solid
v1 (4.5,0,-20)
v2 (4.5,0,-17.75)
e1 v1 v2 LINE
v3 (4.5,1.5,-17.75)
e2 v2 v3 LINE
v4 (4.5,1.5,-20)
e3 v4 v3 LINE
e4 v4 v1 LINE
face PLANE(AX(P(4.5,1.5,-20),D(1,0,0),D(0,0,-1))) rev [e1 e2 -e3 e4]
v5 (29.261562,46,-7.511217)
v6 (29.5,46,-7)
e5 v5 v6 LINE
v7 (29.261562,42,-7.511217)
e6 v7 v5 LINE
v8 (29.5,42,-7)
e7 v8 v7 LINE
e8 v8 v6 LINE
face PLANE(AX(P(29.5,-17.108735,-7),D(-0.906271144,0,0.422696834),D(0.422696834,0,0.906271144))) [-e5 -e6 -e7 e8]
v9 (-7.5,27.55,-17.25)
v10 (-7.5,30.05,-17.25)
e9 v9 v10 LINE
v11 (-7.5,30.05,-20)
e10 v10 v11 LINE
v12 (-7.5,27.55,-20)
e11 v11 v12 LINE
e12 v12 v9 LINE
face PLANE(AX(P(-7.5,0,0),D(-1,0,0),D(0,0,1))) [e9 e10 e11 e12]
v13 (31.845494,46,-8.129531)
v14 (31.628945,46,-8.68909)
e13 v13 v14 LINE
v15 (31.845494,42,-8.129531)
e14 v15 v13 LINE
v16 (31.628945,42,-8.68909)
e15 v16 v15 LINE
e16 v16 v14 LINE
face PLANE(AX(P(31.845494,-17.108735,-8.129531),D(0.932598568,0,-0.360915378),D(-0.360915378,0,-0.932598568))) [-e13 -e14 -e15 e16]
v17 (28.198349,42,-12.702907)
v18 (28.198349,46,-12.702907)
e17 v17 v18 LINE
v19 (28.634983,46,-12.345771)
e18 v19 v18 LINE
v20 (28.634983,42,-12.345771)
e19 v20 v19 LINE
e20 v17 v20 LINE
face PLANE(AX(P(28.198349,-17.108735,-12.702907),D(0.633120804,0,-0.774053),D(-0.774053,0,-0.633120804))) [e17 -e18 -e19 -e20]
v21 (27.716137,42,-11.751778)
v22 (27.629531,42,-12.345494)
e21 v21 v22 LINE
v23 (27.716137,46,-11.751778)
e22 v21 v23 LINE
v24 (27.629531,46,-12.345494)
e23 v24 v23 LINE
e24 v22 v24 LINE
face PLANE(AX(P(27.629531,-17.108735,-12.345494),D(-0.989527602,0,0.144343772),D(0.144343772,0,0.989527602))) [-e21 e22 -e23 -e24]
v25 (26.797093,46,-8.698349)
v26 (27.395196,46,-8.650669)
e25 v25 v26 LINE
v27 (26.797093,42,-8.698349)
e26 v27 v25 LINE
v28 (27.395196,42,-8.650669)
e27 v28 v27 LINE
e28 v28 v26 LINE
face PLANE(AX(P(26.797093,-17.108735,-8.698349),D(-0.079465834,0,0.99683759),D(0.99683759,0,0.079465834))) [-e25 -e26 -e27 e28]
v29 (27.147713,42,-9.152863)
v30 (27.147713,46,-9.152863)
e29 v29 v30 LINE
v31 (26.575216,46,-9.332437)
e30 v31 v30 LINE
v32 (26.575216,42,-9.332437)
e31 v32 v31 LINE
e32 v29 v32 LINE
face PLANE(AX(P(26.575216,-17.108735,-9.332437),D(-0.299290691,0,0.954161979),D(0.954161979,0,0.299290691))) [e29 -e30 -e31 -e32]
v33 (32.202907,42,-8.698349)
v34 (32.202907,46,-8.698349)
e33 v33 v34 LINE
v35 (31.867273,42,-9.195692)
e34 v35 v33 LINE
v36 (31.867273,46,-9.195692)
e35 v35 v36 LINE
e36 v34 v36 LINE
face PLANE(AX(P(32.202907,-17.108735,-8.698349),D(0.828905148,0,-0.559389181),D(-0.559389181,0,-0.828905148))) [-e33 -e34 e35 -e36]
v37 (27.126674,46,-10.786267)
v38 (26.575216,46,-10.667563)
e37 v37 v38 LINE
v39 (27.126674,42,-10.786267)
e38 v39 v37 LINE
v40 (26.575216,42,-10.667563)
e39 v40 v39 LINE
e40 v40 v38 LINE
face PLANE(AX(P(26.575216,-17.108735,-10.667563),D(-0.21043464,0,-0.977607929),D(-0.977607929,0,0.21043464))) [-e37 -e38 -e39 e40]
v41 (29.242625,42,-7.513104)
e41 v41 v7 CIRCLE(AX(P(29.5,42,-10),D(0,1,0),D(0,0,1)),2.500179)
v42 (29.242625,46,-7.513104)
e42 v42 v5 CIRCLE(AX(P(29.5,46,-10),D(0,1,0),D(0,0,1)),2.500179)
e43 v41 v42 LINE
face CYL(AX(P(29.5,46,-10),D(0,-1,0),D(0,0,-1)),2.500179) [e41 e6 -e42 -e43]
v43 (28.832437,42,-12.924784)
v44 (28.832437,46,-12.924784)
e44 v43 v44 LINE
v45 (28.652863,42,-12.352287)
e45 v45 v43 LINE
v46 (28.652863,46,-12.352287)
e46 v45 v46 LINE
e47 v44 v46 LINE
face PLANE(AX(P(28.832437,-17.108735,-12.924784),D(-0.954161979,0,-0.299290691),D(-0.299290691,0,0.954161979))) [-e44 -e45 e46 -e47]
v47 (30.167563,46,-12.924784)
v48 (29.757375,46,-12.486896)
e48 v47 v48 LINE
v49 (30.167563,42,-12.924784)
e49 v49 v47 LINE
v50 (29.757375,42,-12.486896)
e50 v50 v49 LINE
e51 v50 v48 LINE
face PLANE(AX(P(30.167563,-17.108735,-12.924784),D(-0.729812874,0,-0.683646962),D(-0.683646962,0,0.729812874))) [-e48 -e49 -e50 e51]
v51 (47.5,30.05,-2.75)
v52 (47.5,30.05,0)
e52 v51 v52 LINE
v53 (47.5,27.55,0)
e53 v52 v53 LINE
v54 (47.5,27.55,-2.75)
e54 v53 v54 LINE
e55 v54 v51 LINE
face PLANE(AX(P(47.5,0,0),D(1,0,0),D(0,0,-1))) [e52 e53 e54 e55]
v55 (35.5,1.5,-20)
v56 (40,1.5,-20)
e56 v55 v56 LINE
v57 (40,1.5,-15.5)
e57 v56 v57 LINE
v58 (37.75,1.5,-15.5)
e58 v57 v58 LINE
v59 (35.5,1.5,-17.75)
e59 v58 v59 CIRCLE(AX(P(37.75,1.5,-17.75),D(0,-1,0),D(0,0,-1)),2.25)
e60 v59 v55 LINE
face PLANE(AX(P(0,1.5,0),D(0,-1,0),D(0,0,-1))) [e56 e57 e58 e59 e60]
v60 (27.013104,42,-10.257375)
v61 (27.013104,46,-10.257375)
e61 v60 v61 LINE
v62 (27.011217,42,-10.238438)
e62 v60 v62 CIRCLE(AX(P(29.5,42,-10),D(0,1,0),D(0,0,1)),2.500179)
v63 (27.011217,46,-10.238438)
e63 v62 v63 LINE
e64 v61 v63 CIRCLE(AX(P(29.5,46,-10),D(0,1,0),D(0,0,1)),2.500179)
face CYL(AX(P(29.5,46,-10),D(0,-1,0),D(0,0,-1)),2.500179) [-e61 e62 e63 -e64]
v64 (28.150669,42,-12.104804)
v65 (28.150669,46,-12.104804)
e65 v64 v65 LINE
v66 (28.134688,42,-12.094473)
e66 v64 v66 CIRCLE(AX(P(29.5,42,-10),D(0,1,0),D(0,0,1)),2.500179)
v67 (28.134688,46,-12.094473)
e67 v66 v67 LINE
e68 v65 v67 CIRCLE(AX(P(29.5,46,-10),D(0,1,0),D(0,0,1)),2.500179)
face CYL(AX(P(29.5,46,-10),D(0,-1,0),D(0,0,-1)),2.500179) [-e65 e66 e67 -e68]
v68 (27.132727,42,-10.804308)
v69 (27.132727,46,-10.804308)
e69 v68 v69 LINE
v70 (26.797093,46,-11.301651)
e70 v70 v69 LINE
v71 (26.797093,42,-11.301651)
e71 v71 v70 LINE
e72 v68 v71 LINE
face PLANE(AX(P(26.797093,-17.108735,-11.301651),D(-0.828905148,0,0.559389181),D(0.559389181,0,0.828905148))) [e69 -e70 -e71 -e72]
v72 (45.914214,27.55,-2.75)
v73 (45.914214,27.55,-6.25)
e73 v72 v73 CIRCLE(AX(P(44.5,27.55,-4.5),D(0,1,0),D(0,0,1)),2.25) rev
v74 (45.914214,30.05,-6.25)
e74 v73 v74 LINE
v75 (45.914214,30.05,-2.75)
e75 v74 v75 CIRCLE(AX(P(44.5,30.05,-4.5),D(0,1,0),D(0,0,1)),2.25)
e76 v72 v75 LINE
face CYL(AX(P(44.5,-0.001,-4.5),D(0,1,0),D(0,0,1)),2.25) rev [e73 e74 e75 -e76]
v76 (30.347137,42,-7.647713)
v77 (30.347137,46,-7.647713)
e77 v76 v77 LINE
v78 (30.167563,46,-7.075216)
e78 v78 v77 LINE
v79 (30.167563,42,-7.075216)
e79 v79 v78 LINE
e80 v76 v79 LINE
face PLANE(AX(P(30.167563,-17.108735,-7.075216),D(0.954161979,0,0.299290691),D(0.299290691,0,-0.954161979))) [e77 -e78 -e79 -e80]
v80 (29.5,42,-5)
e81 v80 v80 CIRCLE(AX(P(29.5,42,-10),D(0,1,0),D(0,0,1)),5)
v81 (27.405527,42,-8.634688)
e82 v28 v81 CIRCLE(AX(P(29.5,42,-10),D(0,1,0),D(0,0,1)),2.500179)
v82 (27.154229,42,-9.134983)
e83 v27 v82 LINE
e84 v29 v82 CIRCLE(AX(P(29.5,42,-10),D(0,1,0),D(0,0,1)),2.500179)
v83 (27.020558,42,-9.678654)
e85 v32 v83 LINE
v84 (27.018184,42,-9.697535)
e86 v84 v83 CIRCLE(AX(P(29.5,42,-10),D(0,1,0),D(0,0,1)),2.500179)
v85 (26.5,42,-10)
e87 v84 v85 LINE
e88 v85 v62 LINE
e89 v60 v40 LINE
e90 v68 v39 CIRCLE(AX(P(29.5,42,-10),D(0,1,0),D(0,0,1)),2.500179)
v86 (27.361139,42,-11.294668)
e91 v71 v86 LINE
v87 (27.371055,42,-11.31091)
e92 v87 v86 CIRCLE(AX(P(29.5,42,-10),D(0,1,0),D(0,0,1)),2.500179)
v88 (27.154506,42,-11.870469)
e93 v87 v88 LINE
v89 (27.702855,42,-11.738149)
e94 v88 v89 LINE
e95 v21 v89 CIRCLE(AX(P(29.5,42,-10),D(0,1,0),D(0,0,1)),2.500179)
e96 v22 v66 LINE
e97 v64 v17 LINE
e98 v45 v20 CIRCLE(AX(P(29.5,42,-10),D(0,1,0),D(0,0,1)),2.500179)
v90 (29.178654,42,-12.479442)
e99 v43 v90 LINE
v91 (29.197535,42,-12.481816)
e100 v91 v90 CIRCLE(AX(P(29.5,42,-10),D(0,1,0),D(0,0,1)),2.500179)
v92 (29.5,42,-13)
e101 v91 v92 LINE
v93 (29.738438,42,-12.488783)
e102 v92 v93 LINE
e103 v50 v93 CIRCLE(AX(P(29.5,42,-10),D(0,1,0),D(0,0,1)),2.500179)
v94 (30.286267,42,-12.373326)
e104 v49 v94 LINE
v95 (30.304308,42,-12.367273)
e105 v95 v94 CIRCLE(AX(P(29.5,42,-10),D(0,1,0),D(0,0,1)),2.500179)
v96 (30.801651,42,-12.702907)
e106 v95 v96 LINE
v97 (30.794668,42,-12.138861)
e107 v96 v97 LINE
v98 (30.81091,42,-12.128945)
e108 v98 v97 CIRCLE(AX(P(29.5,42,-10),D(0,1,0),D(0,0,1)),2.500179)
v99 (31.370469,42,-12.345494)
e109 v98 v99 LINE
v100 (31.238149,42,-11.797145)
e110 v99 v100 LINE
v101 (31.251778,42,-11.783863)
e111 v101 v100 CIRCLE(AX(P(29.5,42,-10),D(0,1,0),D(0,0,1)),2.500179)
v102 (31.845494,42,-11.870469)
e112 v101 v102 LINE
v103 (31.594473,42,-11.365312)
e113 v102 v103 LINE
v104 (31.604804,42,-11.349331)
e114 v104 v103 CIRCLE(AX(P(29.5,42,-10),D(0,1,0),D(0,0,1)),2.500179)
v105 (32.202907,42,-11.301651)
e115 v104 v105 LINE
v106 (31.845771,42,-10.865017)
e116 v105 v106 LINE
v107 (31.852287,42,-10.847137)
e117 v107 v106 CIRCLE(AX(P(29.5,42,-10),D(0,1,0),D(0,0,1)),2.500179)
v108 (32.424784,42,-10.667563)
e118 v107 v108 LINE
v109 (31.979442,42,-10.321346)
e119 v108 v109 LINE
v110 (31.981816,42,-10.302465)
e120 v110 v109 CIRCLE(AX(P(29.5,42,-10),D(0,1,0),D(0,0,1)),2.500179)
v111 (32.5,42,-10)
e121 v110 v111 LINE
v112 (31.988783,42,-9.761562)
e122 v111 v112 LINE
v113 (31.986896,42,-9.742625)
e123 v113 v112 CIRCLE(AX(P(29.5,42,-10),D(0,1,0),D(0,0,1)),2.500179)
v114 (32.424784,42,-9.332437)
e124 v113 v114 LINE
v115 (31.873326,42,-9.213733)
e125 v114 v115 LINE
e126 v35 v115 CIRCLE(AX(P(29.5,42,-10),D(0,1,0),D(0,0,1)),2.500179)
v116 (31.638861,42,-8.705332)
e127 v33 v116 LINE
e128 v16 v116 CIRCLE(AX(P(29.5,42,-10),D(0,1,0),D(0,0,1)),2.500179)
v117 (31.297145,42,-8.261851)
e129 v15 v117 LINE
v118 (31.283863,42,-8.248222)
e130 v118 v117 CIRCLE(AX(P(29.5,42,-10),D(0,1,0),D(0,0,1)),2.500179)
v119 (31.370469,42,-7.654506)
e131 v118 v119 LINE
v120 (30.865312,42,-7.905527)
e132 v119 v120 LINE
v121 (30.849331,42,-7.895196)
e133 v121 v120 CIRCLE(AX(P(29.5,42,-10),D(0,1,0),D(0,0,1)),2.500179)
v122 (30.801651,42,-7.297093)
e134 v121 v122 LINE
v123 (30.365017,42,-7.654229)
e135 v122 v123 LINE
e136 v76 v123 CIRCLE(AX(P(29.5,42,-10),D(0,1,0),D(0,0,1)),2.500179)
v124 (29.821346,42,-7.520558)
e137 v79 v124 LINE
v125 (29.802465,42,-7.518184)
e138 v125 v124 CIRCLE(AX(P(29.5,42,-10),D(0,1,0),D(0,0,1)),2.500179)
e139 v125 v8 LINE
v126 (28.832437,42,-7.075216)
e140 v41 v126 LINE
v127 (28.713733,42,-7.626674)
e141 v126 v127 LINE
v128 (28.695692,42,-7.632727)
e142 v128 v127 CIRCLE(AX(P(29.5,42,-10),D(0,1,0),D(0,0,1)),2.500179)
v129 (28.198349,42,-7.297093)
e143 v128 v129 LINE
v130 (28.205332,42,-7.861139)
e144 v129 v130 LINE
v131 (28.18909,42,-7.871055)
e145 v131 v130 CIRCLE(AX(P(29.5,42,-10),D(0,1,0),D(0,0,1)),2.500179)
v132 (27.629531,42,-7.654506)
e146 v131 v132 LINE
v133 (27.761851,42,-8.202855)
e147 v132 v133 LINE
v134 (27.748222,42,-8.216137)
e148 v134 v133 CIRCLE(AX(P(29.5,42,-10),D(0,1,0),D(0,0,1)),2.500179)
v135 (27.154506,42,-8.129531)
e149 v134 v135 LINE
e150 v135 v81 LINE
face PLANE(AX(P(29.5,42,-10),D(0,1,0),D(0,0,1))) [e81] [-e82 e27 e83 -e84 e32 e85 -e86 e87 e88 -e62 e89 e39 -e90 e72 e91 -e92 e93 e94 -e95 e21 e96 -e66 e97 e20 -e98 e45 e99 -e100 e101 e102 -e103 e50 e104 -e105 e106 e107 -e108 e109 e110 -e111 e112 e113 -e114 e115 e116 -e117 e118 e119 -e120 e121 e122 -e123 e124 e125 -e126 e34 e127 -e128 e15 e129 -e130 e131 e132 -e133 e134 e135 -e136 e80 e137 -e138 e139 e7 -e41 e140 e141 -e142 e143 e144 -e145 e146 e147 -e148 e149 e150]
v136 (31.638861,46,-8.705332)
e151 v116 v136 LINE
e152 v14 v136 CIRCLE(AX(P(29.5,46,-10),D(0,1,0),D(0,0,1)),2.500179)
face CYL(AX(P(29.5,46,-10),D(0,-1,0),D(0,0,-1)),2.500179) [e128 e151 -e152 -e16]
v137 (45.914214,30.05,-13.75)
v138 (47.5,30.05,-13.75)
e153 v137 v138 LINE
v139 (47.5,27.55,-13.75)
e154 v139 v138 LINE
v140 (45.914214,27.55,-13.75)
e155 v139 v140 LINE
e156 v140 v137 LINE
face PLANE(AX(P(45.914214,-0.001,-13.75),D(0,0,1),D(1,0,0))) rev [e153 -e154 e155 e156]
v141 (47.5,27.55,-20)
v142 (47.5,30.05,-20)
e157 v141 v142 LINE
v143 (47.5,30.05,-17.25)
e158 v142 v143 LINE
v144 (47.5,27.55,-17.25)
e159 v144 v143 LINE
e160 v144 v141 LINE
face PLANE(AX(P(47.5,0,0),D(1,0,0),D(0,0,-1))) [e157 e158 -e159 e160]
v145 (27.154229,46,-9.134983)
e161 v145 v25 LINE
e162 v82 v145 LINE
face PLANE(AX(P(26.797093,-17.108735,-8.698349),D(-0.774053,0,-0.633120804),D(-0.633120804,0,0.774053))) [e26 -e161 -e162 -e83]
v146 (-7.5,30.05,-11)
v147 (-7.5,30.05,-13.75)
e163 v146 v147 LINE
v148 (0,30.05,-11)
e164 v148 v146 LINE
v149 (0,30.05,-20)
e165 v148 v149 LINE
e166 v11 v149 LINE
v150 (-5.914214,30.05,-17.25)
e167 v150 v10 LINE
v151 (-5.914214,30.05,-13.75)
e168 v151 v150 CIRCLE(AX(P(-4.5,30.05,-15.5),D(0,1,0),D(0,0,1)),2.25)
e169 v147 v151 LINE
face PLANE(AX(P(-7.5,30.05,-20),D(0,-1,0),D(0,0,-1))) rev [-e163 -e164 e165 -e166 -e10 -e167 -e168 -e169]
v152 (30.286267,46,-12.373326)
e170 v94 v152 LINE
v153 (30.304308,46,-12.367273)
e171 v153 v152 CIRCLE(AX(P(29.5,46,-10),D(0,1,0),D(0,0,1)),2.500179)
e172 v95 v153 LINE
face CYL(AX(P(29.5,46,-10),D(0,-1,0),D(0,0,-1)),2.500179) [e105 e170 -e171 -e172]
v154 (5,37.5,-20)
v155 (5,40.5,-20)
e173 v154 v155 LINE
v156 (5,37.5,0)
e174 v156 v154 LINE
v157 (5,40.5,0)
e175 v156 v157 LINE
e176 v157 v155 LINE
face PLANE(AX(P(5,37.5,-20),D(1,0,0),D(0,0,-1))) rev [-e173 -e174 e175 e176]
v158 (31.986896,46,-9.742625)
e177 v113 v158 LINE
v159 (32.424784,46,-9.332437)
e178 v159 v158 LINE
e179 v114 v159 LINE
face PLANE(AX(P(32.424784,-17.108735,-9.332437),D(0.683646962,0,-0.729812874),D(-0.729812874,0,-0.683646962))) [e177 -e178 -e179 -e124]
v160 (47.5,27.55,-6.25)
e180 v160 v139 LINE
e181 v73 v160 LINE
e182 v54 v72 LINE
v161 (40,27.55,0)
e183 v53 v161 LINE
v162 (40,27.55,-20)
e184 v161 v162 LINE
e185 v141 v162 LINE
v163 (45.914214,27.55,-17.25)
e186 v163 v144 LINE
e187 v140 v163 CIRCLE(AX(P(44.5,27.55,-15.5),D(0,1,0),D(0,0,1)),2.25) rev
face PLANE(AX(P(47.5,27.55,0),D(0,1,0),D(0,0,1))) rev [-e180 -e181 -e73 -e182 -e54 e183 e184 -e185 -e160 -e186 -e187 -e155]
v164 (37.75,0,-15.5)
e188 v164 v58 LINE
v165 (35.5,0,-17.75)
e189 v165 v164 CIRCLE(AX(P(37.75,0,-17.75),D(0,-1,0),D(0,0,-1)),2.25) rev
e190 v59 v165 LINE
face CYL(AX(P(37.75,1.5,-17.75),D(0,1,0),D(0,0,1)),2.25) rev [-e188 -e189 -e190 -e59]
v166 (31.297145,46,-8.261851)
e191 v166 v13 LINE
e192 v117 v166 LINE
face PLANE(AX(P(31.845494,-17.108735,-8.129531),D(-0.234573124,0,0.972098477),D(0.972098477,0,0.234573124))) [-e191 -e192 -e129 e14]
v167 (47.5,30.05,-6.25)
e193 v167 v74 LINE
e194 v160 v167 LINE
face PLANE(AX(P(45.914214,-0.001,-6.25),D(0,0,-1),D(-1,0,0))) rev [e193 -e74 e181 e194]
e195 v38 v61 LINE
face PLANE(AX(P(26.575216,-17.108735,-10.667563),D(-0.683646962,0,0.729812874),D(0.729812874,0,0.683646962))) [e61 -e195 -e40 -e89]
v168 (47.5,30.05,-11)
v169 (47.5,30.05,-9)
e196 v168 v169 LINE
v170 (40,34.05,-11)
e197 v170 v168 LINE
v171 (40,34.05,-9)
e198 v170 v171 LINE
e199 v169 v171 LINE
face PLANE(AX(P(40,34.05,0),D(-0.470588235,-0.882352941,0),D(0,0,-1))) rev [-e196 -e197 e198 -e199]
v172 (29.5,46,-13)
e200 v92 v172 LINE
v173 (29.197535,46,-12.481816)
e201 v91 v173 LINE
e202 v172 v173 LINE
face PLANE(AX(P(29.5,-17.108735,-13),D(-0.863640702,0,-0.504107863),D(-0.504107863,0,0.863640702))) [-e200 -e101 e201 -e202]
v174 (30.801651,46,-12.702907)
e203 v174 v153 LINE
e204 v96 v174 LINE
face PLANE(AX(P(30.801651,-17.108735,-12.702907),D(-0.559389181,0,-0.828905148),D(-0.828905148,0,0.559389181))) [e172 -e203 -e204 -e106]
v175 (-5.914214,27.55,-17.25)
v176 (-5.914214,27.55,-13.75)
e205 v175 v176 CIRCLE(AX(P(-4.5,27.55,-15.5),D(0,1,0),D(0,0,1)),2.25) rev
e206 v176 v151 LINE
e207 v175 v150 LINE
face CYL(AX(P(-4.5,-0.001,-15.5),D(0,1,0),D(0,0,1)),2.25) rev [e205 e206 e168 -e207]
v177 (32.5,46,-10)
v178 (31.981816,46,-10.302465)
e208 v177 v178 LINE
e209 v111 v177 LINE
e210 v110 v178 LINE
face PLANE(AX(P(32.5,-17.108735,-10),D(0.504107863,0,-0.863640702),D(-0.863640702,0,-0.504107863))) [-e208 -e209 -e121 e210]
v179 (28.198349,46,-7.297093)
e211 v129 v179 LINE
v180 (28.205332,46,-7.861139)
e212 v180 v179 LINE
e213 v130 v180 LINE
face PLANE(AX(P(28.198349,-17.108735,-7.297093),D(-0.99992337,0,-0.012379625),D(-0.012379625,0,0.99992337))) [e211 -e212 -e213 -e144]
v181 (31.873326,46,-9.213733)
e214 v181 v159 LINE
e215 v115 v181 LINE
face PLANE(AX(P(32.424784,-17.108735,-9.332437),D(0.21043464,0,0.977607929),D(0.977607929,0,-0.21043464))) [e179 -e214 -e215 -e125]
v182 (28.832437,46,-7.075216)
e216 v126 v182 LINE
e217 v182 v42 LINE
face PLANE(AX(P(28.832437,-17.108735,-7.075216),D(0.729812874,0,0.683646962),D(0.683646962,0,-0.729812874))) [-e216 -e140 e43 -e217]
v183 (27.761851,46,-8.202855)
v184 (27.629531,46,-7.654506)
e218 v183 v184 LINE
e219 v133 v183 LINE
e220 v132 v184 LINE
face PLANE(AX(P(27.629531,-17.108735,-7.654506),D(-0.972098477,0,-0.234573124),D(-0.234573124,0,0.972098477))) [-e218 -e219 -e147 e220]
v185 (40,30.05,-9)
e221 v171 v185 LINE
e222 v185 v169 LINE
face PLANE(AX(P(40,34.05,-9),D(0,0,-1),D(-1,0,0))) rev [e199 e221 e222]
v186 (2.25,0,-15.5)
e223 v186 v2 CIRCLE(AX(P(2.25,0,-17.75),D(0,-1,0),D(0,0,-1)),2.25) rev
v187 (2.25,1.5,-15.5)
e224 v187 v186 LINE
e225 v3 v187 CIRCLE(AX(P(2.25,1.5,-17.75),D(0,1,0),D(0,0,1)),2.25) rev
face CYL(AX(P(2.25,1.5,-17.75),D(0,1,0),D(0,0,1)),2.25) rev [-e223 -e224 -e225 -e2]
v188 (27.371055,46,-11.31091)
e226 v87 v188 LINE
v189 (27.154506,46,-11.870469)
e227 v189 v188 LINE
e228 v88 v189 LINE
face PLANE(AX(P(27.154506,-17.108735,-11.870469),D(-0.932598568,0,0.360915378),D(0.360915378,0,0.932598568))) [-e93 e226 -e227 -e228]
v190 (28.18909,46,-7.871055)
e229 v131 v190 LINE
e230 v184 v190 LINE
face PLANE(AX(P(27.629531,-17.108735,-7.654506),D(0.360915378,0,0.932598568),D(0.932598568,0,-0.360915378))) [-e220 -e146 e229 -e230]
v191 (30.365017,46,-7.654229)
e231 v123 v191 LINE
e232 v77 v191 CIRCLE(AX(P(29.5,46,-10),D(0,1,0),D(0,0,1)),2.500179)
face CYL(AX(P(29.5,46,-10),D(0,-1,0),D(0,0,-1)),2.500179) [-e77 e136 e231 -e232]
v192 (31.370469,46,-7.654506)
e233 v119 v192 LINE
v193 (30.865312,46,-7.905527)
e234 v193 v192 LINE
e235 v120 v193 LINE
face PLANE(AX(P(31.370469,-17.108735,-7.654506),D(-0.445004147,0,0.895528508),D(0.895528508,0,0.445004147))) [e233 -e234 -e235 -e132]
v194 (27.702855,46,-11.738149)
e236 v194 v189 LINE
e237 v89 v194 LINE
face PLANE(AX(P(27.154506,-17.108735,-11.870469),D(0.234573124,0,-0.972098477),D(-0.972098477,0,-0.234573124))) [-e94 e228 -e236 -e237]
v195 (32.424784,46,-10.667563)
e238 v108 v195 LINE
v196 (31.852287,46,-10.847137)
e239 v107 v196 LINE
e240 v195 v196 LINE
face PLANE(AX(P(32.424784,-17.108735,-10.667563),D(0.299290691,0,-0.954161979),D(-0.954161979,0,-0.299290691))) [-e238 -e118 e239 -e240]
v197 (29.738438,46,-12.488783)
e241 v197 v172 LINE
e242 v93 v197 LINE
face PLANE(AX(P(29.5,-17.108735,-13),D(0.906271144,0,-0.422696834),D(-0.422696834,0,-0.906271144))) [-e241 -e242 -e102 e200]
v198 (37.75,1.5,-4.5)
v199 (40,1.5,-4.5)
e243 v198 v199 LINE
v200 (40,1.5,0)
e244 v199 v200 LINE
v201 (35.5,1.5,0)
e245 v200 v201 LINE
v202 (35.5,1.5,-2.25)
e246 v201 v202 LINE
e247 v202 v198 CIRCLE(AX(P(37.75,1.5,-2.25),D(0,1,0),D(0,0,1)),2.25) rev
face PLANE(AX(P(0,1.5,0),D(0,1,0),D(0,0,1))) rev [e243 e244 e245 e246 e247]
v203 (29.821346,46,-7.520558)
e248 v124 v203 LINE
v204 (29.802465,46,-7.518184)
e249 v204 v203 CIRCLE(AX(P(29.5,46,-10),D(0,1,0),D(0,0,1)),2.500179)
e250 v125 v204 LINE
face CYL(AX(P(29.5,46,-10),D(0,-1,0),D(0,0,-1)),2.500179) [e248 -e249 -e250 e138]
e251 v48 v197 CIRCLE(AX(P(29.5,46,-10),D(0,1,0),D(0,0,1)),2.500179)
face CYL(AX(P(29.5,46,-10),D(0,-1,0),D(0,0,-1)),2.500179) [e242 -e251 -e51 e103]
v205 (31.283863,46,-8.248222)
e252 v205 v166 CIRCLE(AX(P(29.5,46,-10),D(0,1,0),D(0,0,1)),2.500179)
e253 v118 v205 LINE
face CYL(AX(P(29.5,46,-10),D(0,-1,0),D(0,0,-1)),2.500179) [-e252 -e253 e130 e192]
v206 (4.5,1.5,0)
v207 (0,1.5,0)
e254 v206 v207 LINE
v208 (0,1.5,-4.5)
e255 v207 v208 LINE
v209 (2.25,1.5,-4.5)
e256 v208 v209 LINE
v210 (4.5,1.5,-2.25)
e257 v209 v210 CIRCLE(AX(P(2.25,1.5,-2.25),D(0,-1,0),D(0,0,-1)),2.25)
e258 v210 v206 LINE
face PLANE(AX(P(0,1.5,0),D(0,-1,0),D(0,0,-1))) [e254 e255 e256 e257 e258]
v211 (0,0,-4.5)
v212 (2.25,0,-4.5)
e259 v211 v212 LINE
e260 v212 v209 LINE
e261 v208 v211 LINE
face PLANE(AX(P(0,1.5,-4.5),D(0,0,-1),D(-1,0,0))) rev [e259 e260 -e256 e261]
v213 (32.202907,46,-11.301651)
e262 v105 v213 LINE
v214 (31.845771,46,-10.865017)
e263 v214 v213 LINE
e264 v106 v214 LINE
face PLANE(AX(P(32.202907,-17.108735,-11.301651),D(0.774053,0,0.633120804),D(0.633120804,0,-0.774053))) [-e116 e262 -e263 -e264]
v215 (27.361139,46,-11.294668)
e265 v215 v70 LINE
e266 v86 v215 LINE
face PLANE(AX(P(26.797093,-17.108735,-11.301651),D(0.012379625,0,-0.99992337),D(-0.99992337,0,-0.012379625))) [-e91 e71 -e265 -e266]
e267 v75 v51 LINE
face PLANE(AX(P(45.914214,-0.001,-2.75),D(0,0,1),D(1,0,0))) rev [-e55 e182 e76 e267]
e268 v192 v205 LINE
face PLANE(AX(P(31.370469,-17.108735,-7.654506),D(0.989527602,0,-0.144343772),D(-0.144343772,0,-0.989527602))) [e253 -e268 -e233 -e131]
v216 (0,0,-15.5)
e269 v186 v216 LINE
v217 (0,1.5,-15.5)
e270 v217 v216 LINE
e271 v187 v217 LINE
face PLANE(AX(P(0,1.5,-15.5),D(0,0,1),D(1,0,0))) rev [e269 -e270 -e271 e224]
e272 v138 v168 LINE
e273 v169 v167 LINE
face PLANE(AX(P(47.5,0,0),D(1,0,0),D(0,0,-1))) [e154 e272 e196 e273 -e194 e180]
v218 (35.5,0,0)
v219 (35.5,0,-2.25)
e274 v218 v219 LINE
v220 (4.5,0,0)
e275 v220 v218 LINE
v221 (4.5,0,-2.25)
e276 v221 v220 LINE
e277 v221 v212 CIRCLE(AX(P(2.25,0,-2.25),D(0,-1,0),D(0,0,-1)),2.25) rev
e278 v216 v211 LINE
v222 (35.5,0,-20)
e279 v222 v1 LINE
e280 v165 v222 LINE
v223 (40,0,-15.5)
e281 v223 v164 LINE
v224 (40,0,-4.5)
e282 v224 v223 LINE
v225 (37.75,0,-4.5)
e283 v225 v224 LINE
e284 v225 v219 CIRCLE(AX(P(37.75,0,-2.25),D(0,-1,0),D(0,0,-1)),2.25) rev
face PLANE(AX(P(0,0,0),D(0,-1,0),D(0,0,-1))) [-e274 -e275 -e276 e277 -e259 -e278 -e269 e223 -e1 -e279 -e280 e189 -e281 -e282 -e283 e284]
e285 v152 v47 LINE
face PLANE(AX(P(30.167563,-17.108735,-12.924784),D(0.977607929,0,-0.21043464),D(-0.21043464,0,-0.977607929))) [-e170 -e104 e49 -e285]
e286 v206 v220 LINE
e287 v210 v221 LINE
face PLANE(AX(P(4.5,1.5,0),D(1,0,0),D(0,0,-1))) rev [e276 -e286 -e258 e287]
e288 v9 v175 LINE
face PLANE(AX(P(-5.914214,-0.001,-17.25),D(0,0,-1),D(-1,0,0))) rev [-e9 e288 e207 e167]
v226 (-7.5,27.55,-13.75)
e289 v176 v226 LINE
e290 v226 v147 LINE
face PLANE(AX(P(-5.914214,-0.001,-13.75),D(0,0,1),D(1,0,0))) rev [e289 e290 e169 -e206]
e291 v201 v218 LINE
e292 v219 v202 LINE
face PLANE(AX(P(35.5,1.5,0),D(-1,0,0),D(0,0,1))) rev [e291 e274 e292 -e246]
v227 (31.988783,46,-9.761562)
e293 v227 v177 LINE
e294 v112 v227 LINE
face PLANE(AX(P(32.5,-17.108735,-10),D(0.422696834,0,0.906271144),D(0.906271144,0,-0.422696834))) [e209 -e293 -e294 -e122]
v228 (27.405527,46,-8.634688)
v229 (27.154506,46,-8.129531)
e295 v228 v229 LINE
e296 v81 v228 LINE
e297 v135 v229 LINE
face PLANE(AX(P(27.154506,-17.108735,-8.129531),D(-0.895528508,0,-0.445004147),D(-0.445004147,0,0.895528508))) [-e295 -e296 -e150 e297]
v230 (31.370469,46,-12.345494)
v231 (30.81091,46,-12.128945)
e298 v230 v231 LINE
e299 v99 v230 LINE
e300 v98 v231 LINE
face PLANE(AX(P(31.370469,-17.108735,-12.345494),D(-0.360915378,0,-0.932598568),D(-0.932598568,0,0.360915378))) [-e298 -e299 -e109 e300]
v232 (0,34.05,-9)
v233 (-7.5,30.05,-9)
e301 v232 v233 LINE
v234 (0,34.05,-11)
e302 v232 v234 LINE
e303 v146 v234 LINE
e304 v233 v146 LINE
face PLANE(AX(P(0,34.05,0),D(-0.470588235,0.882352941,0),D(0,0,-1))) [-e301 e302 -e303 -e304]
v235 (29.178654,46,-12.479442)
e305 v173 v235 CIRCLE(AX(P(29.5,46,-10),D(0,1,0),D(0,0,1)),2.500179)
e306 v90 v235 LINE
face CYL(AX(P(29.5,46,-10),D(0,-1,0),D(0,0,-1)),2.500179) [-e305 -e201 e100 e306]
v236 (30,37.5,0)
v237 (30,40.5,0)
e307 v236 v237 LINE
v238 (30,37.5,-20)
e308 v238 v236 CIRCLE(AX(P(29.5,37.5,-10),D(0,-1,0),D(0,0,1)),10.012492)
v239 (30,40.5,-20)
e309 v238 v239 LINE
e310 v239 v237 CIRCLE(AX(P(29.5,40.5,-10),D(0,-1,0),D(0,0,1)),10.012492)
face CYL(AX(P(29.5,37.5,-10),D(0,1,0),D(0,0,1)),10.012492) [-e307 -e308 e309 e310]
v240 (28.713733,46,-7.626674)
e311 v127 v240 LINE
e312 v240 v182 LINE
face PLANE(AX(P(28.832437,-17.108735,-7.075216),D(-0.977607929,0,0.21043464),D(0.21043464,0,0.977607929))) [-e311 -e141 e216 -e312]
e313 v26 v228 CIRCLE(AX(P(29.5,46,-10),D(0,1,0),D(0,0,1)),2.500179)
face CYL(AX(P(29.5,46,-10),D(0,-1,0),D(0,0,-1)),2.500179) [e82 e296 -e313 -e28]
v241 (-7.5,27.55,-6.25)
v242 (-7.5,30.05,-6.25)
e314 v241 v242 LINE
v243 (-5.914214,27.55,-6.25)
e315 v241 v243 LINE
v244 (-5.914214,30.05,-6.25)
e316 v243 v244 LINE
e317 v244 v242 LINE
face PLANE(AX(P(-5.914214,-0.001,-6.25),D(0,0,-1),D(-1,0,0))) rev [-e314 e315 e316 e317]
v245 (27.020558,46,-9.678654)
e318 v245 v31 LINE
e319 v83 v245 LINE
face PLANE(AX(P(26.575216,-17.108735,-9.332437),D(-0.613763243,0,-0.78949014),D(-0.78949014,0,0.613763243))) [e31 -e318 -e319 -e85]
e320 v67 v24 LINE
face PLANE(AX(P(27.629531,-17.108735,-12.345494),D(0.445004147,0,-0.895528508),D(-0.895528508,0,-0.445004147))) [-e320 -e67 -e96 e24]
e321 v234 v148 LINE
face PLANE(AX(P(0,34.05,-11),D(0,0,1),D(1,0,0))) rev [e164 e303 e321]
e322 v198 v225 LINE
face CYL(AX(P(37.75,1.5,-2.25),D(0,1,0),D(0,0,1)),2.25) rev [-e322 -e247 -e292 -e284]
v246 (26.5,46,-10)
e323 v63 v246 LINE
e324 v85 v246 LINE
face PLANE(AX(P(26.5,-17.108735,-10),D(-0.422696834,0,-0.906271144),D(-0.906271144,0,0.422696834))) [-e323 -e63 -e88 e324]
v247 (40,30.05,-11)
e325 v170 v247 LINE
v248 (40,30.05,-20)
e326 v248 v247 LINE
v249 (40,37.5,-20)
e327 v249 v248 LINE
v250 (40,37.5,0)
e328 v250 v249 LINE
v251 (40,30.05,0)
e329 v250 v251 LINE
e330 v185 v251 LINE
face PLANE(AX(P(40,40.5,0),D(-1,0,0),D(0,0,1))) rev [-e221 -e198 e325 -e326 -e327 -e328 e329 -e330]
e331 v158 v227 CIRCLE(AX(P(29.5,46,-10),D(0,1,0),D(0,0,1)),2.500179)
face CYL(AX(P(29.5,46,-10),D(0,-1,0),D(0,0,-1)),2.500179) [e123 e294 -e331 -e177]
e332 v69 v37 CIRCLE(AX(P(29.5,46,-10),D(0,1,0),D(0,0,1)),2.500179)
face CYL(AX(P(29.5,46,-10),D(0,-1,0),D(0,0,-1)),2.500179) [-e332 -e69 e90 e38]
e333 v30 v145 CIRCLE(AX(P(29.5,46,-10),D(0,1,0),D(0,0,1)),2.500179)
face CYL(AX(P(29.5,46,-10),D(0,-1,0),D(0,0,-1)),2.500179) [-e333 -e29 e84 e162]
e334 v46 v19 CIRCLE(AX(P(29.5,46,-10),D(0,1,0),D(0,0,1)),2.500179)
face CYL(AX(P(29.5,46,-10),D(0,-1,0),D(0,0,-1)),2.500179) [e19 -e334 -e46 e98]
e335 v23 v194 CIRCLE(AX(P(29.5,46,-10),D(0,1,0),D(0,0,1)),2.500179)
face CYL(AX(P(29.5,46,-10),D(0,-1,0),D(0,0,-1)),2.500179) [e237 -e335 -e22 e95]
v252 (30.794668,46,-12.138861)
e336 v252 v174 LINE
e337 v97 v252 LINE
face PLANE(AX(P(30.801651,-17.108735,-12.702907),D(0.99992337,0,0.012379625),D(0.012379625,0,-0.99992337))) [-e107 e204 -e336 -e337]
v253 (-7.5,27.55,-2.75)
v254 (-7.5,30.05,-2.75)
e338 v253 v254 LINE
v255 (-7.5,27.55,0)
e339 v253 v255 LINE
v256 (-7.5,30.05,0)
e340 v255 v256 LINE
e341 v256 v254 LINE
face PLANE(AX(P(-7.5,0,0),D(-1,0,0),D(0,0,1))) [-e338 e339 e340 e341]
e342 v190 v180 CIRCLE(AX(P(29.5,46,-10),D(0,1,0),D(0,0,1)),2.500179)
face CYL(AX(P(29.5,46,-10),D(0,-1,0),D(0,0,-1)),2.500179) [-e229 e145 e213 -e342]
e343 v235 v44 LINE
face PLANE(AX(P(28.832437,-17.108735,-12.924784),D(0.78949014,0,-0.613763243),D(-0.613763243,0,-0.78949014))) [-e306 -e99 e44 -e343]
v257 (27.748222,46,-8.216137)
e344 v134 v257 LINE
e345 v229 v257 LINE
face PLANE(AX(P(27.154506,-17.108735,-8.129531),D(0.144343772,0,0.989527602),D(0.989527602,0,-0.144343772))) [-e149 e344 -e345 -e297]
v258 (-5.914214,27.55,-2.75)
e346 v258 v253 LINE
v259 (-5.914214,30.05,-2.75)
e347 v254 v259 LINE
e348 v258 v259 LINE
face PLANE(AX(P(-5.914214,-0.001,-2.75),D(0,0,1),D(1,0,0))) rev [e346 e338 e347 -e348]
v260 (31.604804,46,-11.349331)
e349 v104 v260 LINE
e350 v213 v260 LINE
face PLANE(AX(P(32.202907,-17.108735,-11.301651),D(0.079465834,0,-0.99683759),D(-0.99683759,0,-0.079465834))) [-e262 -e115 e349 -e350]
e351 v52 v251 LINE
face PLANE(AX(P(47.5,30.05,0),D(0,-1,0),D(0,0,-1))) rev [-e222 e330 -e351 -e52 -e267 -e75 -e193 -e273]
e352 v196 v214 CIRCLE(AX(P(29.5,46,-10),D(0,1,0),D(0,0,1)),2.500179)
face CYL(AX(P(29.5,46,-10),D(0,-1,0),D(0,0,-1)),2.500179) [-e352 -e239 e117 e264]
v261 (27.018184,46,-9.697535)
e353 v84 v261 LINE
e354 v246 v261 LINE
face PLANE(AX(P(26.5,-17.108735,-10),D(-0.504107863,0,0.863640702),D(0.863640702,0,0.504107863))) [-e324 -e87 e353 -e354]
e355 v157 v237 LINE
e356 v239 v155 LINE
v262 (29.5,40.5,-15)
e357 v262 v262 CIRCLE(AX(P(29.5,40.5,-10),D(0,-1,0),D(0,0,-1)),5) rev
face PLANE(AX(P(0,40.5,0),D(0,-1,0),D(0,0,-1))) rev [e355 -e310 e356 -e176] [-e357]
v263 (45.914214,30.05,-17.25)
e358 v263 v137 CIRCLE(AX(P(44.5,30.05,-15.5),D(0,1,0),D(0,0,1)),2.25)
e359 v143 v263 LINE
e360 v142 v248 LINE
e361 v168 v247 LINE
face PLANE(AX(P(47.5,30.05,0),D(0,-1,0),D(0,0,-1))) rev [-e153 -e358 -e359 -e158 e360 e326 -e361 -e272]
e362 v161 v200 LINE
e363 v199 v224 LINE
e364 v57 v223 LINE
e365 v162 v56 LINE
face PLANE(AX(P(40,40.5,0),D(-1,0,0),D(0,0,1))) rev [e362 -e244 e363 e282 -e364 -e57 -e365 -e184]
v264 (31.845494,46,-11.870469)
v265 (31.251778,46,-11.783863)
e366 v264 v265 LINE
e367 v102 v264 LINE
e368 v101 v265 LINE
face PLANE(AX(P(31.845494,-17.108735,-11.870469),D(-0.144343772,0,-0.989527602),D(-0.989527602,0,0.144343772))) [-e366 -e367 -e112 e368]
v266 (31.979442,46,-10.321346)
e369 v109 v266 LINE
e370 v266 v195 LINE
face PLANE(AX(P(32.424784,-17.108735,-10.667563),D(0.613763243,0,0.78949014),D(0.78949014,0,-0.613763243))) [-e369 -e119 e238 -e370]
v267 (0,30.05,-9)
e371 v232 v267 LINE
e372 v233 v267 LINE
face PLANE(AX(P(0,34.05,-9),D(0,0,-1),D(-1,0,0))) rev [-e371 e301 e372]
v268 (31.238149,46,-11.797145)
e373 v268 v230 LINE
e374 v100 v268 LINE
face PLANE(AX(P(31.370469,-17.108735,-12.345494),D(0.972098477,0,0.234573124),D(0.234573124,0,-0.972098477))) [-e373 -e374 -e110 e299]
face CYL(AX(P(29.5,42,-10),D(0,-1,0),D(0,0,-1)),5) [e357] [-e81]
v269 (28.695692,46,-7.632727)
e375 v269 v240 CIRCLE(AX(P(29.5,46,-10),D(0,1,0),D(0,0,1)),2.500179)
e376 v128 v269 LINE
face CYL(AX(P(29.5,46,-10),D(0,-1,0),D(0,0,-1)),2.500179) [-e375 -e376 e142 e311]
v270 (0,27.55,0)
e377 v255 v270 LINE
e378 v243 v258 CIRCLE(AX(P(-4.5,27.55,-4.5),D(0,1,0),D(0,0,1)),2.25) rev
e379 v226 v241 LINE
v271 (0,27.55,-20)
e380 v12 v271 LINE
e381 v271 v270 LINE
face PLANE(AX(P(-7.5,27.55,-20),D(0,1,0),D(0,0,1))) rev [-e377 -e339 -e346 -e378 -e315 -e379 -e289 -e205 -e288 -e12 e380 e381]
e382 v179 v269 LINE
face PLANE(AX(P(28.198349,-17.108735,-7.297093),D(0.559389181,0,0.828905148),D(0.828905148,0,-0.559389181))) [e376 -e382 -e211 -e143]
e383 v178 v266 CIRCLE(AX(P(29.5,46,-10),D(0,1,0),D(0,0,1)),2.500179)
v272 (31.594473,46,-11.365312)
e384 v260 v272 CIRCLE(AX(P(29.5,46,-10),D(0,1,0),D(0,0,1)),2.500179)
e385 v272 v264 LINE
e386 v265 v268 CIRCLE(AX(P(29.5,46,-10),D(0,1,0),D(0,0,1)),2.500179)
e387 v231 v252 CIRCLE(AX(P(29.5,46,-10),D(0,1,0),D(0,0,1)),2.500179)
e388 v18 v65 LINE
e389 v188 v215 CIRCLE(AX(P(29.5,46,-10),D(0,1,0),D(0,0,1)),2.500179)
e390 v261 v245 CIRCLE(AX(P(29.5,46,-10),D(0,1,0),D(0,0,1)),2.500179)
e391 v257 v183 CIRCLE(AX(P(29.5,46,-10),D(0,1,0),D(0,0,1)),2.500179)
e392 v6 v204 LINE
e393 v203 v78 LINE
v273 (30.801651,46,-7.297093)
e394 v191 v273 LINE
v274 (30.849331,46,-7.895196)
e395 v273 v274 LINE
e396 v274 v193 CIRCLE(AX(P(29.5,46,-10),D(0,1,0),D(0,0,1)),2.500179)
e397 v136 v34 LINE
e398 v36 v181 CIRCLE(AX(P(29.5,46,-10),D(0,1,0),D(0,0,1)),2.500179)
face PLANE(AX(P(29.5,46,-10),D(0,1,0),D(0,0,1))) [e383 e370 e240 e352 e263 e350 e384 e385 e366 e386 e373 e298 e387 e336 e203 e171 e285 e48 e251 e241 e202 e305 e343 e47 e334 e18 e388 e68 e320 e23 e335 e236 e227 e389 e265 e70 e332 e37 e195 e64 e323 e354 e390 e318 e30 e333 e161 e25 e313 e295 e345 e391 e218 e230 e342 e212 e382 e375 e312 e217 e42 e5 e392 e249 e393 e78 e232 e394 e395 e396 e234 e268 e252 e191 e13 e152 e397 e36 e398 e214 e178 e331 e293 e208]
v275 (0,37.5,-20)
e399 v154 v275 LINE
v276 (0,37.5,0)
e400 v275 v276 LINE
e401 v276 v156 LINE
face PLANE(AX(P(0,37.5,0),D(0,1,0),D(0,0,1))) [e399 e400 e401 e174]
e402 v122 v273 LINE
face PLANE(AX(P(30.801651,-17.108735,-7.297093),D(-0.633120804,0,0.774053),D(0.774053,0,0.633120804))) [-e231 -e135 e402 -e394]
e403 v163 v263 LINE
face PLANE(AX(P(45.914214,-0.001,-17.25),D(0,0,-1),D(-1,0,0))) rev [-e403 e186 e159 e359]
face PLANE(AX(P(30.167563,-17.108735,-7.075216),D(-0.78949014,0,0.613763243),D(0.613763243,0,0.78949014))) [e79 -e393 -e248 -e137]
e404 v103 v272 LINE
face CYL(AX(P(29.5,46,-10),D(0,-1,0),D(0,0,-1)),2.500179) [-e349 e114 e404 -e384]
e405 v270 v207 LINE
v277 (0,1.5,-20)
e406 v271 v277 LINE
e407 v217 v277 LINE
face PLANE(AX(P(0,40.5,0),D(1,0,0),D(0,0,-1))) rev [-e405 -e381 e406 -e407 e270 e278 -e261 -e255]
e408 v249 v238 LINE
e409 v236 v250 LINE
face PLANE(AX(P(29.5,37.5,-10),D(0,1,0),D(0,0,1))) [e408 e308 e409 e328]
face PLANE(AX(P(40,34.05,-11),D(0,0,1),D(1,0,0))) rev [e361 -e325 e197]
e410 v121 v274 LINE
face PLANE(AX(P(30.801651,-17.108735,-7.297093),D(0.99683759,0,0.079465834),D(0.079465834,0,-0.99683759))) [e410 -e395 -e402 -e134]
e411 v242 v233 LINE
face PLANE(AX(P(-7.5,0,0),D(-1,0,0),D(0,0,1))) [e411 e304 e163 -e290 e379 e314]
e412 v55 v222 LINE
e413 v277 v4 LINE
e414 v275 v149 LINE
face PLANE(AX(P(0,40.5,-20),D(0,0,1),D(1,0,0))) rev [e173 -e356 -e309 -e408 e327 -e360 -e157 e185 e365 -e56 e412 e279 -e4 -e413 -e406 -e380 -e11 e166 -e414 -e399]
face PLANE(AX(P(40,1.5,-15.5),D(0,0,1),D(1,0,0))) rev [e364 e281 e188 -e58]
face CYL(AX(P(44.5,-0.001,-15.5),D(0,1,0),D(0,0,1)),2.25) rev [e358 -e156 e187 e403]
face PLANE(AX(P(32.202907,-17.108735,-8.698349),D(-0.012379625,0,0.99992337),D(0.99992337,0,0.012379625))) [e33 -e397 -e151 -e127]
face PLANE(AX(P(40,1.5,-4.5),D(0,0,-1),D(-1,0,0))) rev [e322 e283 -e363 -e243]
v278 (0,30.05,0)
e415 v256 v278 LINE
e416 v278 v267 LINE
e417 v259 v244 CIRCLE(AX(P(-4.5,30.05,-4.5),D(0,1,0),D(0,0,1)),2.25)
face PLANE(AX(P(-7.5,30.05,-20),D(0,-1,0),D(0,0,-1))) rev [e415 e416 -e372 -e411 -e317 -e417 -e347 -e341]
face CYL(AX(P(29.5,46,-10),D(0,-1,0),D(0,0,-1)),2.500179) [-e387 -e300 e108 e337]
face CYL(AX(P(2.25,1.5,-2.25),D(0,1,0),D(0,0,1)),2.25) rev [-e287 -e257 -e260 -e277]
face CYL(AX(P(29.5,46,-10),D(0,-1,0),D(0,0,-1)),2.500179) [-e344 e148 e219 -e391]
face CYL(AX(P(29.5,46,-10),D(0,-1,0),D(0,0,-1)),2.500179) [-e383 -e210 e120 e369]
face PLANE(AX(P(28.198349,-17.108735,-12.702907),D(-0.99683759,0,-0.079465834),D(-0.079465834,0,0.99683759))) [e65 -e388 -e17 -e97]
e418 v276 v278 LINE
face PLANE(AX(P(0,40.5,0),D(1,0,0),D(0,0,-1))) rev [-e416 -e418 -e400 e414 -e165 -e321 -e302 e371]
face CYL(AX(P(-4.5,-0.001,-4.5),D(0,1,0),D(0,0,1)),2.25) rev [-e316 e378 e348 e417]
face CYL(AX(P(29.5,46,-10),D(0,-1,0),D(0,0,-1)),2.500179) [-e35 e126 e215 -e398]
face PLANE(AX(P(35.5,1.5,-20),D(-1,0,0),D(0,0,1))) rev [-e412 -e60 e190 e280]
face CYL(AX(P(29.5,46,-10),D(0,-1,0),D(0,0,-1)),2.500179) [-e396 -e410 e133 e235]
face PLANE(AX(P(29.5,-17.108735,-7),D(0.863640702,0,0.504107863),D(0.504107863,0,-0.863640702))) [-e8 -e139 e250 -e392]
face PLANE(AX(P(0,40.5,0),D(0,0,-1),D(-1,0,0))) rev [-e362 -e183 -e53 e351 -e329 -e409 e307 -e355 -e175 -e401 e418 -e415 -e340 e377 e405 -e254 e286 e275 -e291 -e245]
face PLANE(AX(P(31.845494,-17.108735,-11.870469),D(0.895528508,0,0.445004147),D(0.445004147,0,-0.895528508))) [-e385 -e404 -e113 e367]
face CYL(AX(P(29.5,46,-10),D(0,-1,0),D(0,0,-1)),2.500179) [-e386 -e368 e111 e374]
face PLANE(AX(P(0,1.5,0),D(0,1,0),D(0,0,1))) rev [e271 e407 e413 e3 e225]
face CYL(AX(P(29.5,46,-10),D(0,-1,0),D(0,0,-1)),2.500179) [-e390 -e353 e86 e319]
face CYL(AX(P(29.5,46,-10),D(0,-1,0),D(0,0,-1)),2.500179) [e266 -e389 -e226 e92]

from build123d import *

# Parameters (mm, degrees)
SKETCH1_W           = 40
SKETCH1_H           = 20
BOSS_EXTRUDE1_DEPTH = 40.5
SKETCH2_R           = 5
BOSS_EXTRUDE2_DEPTH = 1.5
SKETCH3_W           = 20
SKETCH3_H           = 2.5
BOSS_EXTRUDE3_DEPTH = 7.5
SKETCH4_W           = 20
SKETCH4_H           = 2.5
BOSS_EXTRUDE4_DEPTH = 7.5
SKETCH5_W           = 5
SKETCH5_H           = 20
CUT_EXTRUDE1_DEPTH  = 3
SKETCH6_R           = 3
BOSS_EXTRUDE5_DEPTH = 4
SKETCH7_OUTSIDE_W   = 71.888
SKETCH7_OUTSIDE_H   = 36.888
CUT_EXTRUDE2_DEPTH  = 4
BOSS_EXTRUDE6_START = 4
SKETCH8_R           = 2.500178688
BOSS_EXTRUDE6_DEPTH = 4
SKETCH9_W           = 7.5
SKETCH9_H           = 2
BOSS_EXTRUDE7_DEPTH = 4
CHAMFER1_SIZE2      = 7.5
CHAMFER1_SIZE       = 4
CHAMFER2_SIZE2      = 7.5
CHAMFER2_SIZE       = 4
CUT_EXTRUDE3_REACH  = 61.659
SKETCH11_W          = 4.5
SKETCH11_H          = 4.5
CUT_EXTRUDE4_DEPTH  = 1.5
FILLET1_R           = 2.25


with BuildPart() as part:
    # Sketch1 → Boss-Extrude1 (new body)
    with BuildSketch(Plane(origin=(0, 0, 0), x_dir=(1, 0, 0), z_dir=(0, 1, 0))):
        with Locations((20, 10)):
            Rectangle(SKETCH1_W, SKETCH1_H)
    extrude(amount=BOSS_EXTRUDE1_DEPTH)

    # Sketch2 → Boss-Extrude2 (add)
    with BuildSketch(Plane(origin=(0, 40.5, 0), x_dir=(1, 0, 0), z_dir=(0, 1, 0))):
        with Locations(Location((29.5, 10, 0), (0, 0, 90))):
            Circle(SKETCH2_R)
    extrude(amount=BOSS_EXTRUDE2_DEPTH)

    # Sketch3 → Boss-Extrude3 (add)
    with BuildSketch(Plane(origin=(40, 0, 0), x_dir=(0, 0, -1), z_dir=(1, 0, 0))):
        with Locations((10, 28.8)):
            Rectangle(SKETCH3_W, SKETCH3_H)
    extrude(amount=BOSS_EXTRUDE3_DEPTH)

    # Sketch4 → Boss-Extrude4 (add)
    with BuildSketch(Plane.ZY):
        with Locations((-10, 28.8)):
            Rectangle(SKETCH4_W, SKETCH4_H)
    extrude(amount=BOSS_EXTRUDE4_DEPTH)

    # Sketch5 → Cut-Extrude1 (cut)
    with BuildSketch(Plane(origin=(0, 40.5, 0), x_dir=(1, 0, 0), z_dir=(0, 1, 0))):
        with Locations((2.5, 10)):
            Rectangle(SKETCH5_W, SKETCH5_H)
        with BuildLine():
            Line((30, 0), (40, 0))
            Line((40, 0), (40, 20))
            Line((40, 20), (30, 20))
            ThreePointArc((30, 20), (39.512492197, 10), (30, 0))
        make_face()
    extrude(amount=-CUT_EXTRUDE1_DEPTH, mode=Mode.SUBTRACT)

    # Sketch6 → Boss-Extrude5 (add)
    with BuildSketch(Plane(origin=(0, 42, 0), x_dir=(1, 0, 0), z_dir=(0, 1, 0))):
        with Locations(Location((29.5, 10, 0), (0, 0, 270))):
            Circle(SKETCH6_R)
    extrude(amount=BOSS_EXTRUDE5_DEPTH)

    # Sketch7 outside → Cut-Extrude2 (cut)
    with BuildSketch(Plane(origin=(0, 46, 0), x_dir=(1, 0, 0), z_dir=(0, 1, 0))):
        with Locations((20, 10)):
            Rectangle(SKETCH7_OUTSIDE_W, SKETCH7_OUTSIDE_H)
        with BuildLine():
            Line((29.5, 13), (29.197535282, 12.481815579))
            ThreePointArc((29.197535282, 12.481815579), (29.467797841, 12.499971299), (29.738438382, 12.488782958))
            Line((29.738438382, 12.488782958), (29.5, 13))
        make_face(mode=Mode.SUBTRACT)
        with BuildLine():
            Line((30.167562802, 12.924783737), (29.757374624, 12.486896012))
            ThreePointArc((29.757374624, 12.486896012), (30.024901165, 12.444457453), (30.286266542, 12.373326442))
            Line((30.286266542, 12.373326442), (30.167562802, 12.924783737))
        make_face(mode=Mode.SUBTRACT)
        with BuildLine():
            Line((30.801651217, 12.702906604), (30.304308129, 12.367273095))
            ThreePointArc((30.304308129, 12.367273095), (30.555683752, 12.266368304), (30.794668015, 12.138861427))
            Line((30.794668015, 12.138861427), (30.801651217, 12.702906604))
        make_face(mode=Mode.SUBTRACT)
        with BuildLine():
            Line((31.370469406, 12.345494447), (30.810910265, 12.12894522))
            ThreePointArc((30.810910265, 12.12894522), (31.033529948, 11.974633984), (31.238149427, 11.79714497))
            Line((31.238149427, 11.79714497), (31.370469406, 12.345494447))
        make_face(mode=Mode.SUBTRACT)
        with BuildLine():
            Line((31.845494447, 11.870469406), (31.251777886, 11.783863142))
            ThreePointArc((31.251777886, 11.783863142), (31.434478549, 11.583883271), (31.594472769, 11.36531216))
            Line((31.594472769, 11.36531216), (31.845494447, 11.870469406))
        make_face(mode=Mode.SUBTRACT)
        with BuildLine():
            Line((32.202906604, 11.301651217), (31.60480405, 11.349330718))
            ThreePointArc((31.60480405, 11.349330718), (31.738424318, 11.113710037), (31.845770501, 10.865016897))
            Line((31.845770501, 10.865016897), (32.202906604, 11.301651217))
        make_face(mode=Mode.SUBTRACT)
        with BuildLine():
            Line((32.424783737, 10.667562802), (31.852286549, 10.847137217))
            ThreePointArc((31.852286549, 10.847137217), (31.930126144, 10.587690732), (31.979441504, 10.321346074))
            Line((31.979441504, 10.321346074), (32.424783737, 10.667562802))
        make_face(mode=Mode.SUBTRACT)
        with BuildLine():
            Line((32.5, 10), (31.981815579, 10.302464718))
            ThreePointArc((31.981815579, 10.302464718), (31.999971299, 10.032202159), (31.988782958, 9.761561618))
            Line((31.988782958, 9.761561618), (32.5, 10))
        make_face(mode=Mode.SUBTRACT)
        with BuildLine():
            Line((32.424783737, 9.332437198), (31.986896012, 9.742625376))
            ThreePointArc((31.986896012, 9.742625376), (31.944457453, 9.475098835), (31.873326442, 9.213733458))
            Line((31.873326442, 9.213733458), (32.424783737, 9.332437198))
        make_face(mode=Mode.SUBTRACT)
        with BuildLine():
            Line((32.202906604, 8.698348783), (31.867273095, 9.195691871))
            ThreePointArc((31.867273095, 9.195691871), (31.766368304, 8.944316248), (31.638861427, 8.705331985))
            Line((31.638861427, 8.705331985), (32.202906604, 8.698348783))
        make_face(mode=Mode.SUBTRACT)
        with BuildLine():
            Line((31.845494447, 8.129530594), (31.62894522, 8.689089735))
            ThreePointArc((31.62894522, 8.689089735), (31.474633984, 8.466470052), (31.29714497, 8.261850573))
            Line((31.29714497, 8.261850573), (31.845494447, 8.129530594))
        make_face(mode=Mode.SUBTRACT)
        with BuildLine():
            Line((31.370469406, 7.654505553), (31.283863142, 8.248222114))
            ThreePointArc((31.283863142, 8.248222114), (31.083883271, 8.065521451), (30.86531216, 7.905527231))
            Line((30.86531216, 7.905527231), (31.370469406, 7.654505553))
        make_face(mode=Mode.SUBTRACT)
        with BuildLine():
            Line((30.801651217, 7.297093396), (30.849330718, 7.89519595))
            ThreePointArc((30.849330718, 7.89519595), (30.613710037, 7.761575682), (30.365016897, 7.654229499))
            Line((30.365016897, 7.654229499), (30.801651217, 7.297093396))
        make_face(mode=Mode.SUBTRACT)
        with BuildLine():
            Line((30.167562802, 7.075216263), (30.347137217, 7.647713451))
            ThreePointArc((30.347137217, 7.647713451), (30.087690732, 7.569873856), (29.821346074, 7.520558496))
            Line((29.821346074, 7.520558496), (30.167562802, 7.075216263))
        make_face(mode=Mode.SUBTRACT)
        with BuildLine():
            Line((29.5, 7), (29.802464718, 7.518184421))
            ThreePointArc((29.802464718, 7.518184421), (29.532202159, 7.500028701), (29.261561618, 7.511217042))
            Line((29.261561618, 7.511217042), (29.5, 7))
        make_face(mode=Mode.SUBTRACT)
        with BuildLine():
            Line((28.832437198, 7.075216263), (29.242625376, 7.513103988))
            ThreePointArc((29.242625376, 7.513103988), (28.975098835, 7.555542547), (28.713733458, 7.626673558))
            Line((28.713733458, 7.626673558), (28.832437198, 7.075216263))
        make_face(mode=Mode.SUBTRACT)
        with BuildLine():
            Line((28.198348783, 7.297093396), (28.695691871, 7.632726905))
            ThreePointArc((28.695691871, 7.632726905), (28.444316248, 7.733631696), (28.205331985, 7.861138573))
            Line((28.205331985, 7.861138573), (28.198348783, 7.297093396))
        make_face(mode=Mode.SUBTRACT)
        with BuildLine():
            Line((27.629530594, 7.654505553), (28.189089735, 7.87105478))
            ThreePointArc((28.189089735, 7.87105478), (27.966470052, 8.025366016), (27.761850573, 8.20285503))
            Line((27.761850573, 8.20285503), (27.629530594, 7.654505553))
        make_face(mode=Mode.SUBTRACT)
        with BuildLine():
            Line((27.154505553, 8.129530594), (27.748222114, 8.216136858))
            ThreePointArc((27.748222114, 8.216136858), (27.565521451, 8.416116729), (27.405527231, 8.63468784))
            Line((27.405527231, 8.63468784), (27.154505553, 8.129530594))
        make_face(mode=Mode.SUBTRACT)
        with BuildLine():
            Line((26.797093396, 8.698348783), (27.39519595, 8.650669282))
            ThreePointArc((27.39519595, 8.650669282), (27.261575682, 8.886289963), (27.154229499, 9.134983103))
            Line((27.154229499, 9.134983103), (26.797093396, 8.698348783))
        make_face(mode=Mode.SUBTRACT)
        with BuildLine():
            Line((26.575216263, 9.332437198), (27.147713451, 9.152862783))
            ThreePointArc((27.147713451, 9.152862783), (27.069873856, 9.412309268), (27.020558496, 9.678653926))
            Line((27.020558496, 9.678653926), (26.575216263, 9.332437198))
        make_face(mode=Mode.SUBTRACT)
        with BuildLine():
            Line((26.5, 10), (27.018184421, 9.697535282))
            ThreePointArc((27.018184421, 9.697535282), (27.000028701, 9.967797841), (27.011217042, 10.238438382))
            Line((27.011217042, 10.238438382), (26.5, 10))
        make_face(mode=Mode.SUBTRACT)
        with BuildLine():
            Line((26.575216263, 10.667562802), (27.013103988, 10.257374624))
            ThreePointArc((27.013103988, 10.257374624), (27.055542547, 10.524901165), (27.126673558, 10.786266542))
            Line((27.126673558, 10.786266542), (26.575216263, 10.667562802))
        make_face(mode=Mode.SUBTRACT)
        with BuildLine():
            Line((26.797093396, 11.301651217), (27.132726905, 10.804308129))
            ThreePointArc((27.132726905, 10.804308129), (27.233631696, 11.055683752), (27.361138573, 11.294668015))
            Line((27.361138573, 11.294668015), (26.797093396, 11.301651217))
        make_face(mode=Mode.SUBTRACT)
        with BuildLine():
            Line((27.154505553, 11.870469406), (27.37105478, 11.310910265))
            ThreePointArc((27.37105478, 11.310910265), (27.525366016, 11.533529948), (27.70285503, 11.738149427))
            Line((27.70285503, 11.738149427), (27.154505553, 11.870469406))
        make_face(mode=Mode.SUBTRACT)
        with BuildLine():
            Line((27.629530594, 12.345494447), (27.716136858, 11.751777886))
            ThreePointArc((27.716136858, 11.751777886), (27.916116729, 11.934478549), (28.13468784, 12.094472769))
            Line((28.13468784, 12.094472769), (27.629530594, 12.345494447))
        make_face(mode=Mode.SUBTRACT)
        with BuildLine():
            Line((28.198348783, 12.702906604), (28.150669282, 12.10480405))
            ThreePointArc((28.150669282, 12.10480405), (28.386289963, 12.238424318), (28.634983103, 12.345770501))
            Line((28.634983103, 12.345770501), (28.198348783, 12.702906604))
        make_face(mode=Mode.SUBTRACT)
        with BuildLine():
            Line((28.832437198, 12.924783737), (28.652862783, 12.352286549))
            ThreePointArc((28.652862783, 12.352286549), (28.912309268, 12.430126144), (29.178653926, 12.479441504))
            Line((29.178653926, 12.479441504), (28.832437198, 12.924783737))
        make_face(mode=Mode.SUBTRACT)
    extrude(amount=-CUT_EXTRUDE2_DEPTH, mode=Mode.SUBTRACT)

    # Sketch8 → Boss-Extrude6 (add)
    with BuildSketch(Plane(origin=(0, 42, 0), x_dir=(1, 0, 0), z_dir=(0, 1, 0)).offset(BOSS_EXTRUDE6_START)):
        with Locations((29.5, 10)):
            Circle(SKETCH8_R)
    extrude(amount=-BOSS_EXTRUDE6_DEPTH)

    # Sketch9 → Boss-Extrude7 (add)
    with BuildSketch(Plane(origin=(0, 30.05, 0), x_dir=(1, 0, 0), z_dir=(0, 1, 0))):
        with Locations((-3.75, 10)):
            Rectangle(SKETCH9_W, SKETCH9_H)
        with Locations((43.75, 10)):
            Rectangle(SKETCH9_W, SKETCH9_H)
    extrude(amount=BOSS_EXTRUDE7_DEPTH)

    # Chamfer1
    chamfer1_edges = [part.edges().sort_by_distance(p)[0] for p in [
        (-7.5, 34.05, -10),
    ]]
    chamfer1_side = [part.faces().sort_by_distance(p)[0] for p in [
        (-7.5, 33.97, -10),
    ]]
    chamfer(chamfer1_edges, length=CHAMFER1_SIZE - 0.0001, length2=CHAMFER1_SIZE2 - 0.0001, reference=chamfer1_side[0])  # a hair under: the kernel refuses the full size

    # Chamfer2
    chamfer2_edges = [part.edges().sort_by_distance(p)[0] for p in [
        (47.5, 34.05, -10),
    ]]
    chamfer2_side = [part.faces().sort_by_distance(p)[0] for p in [
        (47.5, 33.97, -10),
    ]]
    chamfer(chamfer2_edges, length=CHAMFER2_SIZE - 0.0001, length2=CHAMFER2_SIZE2 - 0.0001, reference=chamfer2_side[0])  # a hair under: the kernel refuses the full size

    # Sketch10 → Cut-Extrude3 (cut, up to next)
    with BuildSketch(Plane(origin=(0, 30.05, 0), x_dir=(1, 0, 0), z_dir=(0, 1, 0)), mode=Mode.PRIVATE) as cut_extrude3_sk1:
        with BuildLine():
            Line((45.914213562, 17.25), (47.5, 17.25))
            Line((47.5, 17.25), (47.5, 13.75))
            Line((47.5, 13.75), (45.914213562, 13.75))
            ThreePointArc((45.914213562, 13.75), (42.25, 15.5), (45.914213562, 17.25))
        make_face()
    cut_extrude3_tool1 = extrude(cut_extrude3_sk1.sketch, amount=-CUT_EXTRUDE3_REACH, mode=Mode.PRIVATE) & part.part
    # Sketch10 → Cut-Extrude3 (cut, up to next)
    with BuildSketch(Plane(origin=(0, 30.05, 0), x_dir=(1, 0, 0), z_dir=(0, 1, 0)), mode=Mode.PRIVATE) as cut_extrude3_sk2:
        with BuildLine():
            Line((45.914213562, 2.75), (47.5, 2.75))
            Line((47.5, 2.75), (47.5, 6.25))
            Line((47.5, 6.25), (45.914213562, 6.25))
            ThreePointArc((45.914213562, 6.25), (42.25, 4.5), (45.914213562, 2.75))
        make_face()
    cut_extrude3_tool2 = extrude(cut_extrude3_sk2.sketch, amount=-CUT_EXTRUDE3_REACH, mode=Mode.PRIVATE) & part.part
    # Sketch10 → Cut-Extrude3 (cut, up to next)
    with BuildSketch(Plane(origin=(0, 30.05, 0), x_dir=(1, 0, 0), z_dir=(0, 1, 0)), mode=Mode.PRIVATE) as cut_extrude3_sk3:
        with BuildLine():
            Line((-5.914213562, 13.75), (-7.5, 13.75))
            Line((-7.5, 13.75), (-7.5, 17.25))
            Line((-7.5, 17.25), (-5.914213562, 17.25))
            ThreePointArc((-5.914213562, 17.25), (-2.25, 15.5), (-5.914213562, 13.75))
        make_face()
    cut_extrude3_tool3 = extrude(cut_extrude3_sk3.sketch, amount=-CUT_EXTRUDE3_REACH, mode=Mode.PRIVATE) & part.part
    # Sketch10 → Cut-Extrude3 (cut, up to next)
    with BuildSketch(Plane(origin=(0, 30.05, 0), x_dir=(1, 0, 0), z_dir=(0, 1, 0)), mode=Mode.PRIVATE) as cut_extrude3_sk4:
        with BuildLine():
            Line((-5.914213562, 2.75), (-7.5, 2.75))
            Line((-7.5, 2.75), (-7.5, 6.25))
            Line((-7.5, 6.25), (-5.914213562, 6.25))
            ThreePointArc((-5.914213562, 6.25), (-2.25, 4.5), (-5.914213562, 2.75))
        make_face()
    cut_extrude3_tool4 = extrude(cut_extrude3_sk4.sketch, amount=-CUT_EXTRUDE3_REACH, mode=Mode.PRIVATE) & part.part
    add(cut_extrude3_tool1.solids().sort_by_distance((44.946855, 30.05, -15.5))[0], mode=Mode.SUBTRACT)
    add(cut_extrude3_tool2.solids().sort_by_distance((44.946855, 30.05, -4.5))[0], mode=Mode.SUBTRACT)
    add(cut_extrude3_tool3.solids().sort_by_distance((-4.946855, 30.05, -15.5))[0], mode=Mode.SUBTRACT)
    add(cut_extrude3_tool4.solids().sort_by_distance((-4.946855, 30.05, -4.5))[0], mode=Mode.SUBTRACT)

    # Sketch11 → Cut-Extrude4 (cut)
    with BuildSketch(Plane.XZ):
        with Locations((2.25, -2.25)):
            Rectangle(SKETCH11_W, SKETCH11_H)
        with Locations((37.75, -2.25)):
            Rectangle(SKETCH11_W, SKETCH11_H)
        with Locations((2.25, -17.75)):
            Rectangle(SKETCH11_W, SKETCH11_H)
        with Locations((37.75, -17.75)):
            Rectangle(SKETCH11_W, SKETCH11_H)
    extrude(amount=-CUT_EXTRUDE4_DEPTH, mode=Mode.SUBTRACT)

    # Fillet1
    fillet1_edges = [part.edges().sort_by_distance(p)[0] for p in [
        (35.5, 0.75, -4.5),
        (4.5, 0.75, -15.5),
        (35.5, 0.75, -15.5),
        (4.5, 0.75, -4.5),
    ]]
    fillet(fillet1_edges, radius=FILLET1_R)


solid = part.part
